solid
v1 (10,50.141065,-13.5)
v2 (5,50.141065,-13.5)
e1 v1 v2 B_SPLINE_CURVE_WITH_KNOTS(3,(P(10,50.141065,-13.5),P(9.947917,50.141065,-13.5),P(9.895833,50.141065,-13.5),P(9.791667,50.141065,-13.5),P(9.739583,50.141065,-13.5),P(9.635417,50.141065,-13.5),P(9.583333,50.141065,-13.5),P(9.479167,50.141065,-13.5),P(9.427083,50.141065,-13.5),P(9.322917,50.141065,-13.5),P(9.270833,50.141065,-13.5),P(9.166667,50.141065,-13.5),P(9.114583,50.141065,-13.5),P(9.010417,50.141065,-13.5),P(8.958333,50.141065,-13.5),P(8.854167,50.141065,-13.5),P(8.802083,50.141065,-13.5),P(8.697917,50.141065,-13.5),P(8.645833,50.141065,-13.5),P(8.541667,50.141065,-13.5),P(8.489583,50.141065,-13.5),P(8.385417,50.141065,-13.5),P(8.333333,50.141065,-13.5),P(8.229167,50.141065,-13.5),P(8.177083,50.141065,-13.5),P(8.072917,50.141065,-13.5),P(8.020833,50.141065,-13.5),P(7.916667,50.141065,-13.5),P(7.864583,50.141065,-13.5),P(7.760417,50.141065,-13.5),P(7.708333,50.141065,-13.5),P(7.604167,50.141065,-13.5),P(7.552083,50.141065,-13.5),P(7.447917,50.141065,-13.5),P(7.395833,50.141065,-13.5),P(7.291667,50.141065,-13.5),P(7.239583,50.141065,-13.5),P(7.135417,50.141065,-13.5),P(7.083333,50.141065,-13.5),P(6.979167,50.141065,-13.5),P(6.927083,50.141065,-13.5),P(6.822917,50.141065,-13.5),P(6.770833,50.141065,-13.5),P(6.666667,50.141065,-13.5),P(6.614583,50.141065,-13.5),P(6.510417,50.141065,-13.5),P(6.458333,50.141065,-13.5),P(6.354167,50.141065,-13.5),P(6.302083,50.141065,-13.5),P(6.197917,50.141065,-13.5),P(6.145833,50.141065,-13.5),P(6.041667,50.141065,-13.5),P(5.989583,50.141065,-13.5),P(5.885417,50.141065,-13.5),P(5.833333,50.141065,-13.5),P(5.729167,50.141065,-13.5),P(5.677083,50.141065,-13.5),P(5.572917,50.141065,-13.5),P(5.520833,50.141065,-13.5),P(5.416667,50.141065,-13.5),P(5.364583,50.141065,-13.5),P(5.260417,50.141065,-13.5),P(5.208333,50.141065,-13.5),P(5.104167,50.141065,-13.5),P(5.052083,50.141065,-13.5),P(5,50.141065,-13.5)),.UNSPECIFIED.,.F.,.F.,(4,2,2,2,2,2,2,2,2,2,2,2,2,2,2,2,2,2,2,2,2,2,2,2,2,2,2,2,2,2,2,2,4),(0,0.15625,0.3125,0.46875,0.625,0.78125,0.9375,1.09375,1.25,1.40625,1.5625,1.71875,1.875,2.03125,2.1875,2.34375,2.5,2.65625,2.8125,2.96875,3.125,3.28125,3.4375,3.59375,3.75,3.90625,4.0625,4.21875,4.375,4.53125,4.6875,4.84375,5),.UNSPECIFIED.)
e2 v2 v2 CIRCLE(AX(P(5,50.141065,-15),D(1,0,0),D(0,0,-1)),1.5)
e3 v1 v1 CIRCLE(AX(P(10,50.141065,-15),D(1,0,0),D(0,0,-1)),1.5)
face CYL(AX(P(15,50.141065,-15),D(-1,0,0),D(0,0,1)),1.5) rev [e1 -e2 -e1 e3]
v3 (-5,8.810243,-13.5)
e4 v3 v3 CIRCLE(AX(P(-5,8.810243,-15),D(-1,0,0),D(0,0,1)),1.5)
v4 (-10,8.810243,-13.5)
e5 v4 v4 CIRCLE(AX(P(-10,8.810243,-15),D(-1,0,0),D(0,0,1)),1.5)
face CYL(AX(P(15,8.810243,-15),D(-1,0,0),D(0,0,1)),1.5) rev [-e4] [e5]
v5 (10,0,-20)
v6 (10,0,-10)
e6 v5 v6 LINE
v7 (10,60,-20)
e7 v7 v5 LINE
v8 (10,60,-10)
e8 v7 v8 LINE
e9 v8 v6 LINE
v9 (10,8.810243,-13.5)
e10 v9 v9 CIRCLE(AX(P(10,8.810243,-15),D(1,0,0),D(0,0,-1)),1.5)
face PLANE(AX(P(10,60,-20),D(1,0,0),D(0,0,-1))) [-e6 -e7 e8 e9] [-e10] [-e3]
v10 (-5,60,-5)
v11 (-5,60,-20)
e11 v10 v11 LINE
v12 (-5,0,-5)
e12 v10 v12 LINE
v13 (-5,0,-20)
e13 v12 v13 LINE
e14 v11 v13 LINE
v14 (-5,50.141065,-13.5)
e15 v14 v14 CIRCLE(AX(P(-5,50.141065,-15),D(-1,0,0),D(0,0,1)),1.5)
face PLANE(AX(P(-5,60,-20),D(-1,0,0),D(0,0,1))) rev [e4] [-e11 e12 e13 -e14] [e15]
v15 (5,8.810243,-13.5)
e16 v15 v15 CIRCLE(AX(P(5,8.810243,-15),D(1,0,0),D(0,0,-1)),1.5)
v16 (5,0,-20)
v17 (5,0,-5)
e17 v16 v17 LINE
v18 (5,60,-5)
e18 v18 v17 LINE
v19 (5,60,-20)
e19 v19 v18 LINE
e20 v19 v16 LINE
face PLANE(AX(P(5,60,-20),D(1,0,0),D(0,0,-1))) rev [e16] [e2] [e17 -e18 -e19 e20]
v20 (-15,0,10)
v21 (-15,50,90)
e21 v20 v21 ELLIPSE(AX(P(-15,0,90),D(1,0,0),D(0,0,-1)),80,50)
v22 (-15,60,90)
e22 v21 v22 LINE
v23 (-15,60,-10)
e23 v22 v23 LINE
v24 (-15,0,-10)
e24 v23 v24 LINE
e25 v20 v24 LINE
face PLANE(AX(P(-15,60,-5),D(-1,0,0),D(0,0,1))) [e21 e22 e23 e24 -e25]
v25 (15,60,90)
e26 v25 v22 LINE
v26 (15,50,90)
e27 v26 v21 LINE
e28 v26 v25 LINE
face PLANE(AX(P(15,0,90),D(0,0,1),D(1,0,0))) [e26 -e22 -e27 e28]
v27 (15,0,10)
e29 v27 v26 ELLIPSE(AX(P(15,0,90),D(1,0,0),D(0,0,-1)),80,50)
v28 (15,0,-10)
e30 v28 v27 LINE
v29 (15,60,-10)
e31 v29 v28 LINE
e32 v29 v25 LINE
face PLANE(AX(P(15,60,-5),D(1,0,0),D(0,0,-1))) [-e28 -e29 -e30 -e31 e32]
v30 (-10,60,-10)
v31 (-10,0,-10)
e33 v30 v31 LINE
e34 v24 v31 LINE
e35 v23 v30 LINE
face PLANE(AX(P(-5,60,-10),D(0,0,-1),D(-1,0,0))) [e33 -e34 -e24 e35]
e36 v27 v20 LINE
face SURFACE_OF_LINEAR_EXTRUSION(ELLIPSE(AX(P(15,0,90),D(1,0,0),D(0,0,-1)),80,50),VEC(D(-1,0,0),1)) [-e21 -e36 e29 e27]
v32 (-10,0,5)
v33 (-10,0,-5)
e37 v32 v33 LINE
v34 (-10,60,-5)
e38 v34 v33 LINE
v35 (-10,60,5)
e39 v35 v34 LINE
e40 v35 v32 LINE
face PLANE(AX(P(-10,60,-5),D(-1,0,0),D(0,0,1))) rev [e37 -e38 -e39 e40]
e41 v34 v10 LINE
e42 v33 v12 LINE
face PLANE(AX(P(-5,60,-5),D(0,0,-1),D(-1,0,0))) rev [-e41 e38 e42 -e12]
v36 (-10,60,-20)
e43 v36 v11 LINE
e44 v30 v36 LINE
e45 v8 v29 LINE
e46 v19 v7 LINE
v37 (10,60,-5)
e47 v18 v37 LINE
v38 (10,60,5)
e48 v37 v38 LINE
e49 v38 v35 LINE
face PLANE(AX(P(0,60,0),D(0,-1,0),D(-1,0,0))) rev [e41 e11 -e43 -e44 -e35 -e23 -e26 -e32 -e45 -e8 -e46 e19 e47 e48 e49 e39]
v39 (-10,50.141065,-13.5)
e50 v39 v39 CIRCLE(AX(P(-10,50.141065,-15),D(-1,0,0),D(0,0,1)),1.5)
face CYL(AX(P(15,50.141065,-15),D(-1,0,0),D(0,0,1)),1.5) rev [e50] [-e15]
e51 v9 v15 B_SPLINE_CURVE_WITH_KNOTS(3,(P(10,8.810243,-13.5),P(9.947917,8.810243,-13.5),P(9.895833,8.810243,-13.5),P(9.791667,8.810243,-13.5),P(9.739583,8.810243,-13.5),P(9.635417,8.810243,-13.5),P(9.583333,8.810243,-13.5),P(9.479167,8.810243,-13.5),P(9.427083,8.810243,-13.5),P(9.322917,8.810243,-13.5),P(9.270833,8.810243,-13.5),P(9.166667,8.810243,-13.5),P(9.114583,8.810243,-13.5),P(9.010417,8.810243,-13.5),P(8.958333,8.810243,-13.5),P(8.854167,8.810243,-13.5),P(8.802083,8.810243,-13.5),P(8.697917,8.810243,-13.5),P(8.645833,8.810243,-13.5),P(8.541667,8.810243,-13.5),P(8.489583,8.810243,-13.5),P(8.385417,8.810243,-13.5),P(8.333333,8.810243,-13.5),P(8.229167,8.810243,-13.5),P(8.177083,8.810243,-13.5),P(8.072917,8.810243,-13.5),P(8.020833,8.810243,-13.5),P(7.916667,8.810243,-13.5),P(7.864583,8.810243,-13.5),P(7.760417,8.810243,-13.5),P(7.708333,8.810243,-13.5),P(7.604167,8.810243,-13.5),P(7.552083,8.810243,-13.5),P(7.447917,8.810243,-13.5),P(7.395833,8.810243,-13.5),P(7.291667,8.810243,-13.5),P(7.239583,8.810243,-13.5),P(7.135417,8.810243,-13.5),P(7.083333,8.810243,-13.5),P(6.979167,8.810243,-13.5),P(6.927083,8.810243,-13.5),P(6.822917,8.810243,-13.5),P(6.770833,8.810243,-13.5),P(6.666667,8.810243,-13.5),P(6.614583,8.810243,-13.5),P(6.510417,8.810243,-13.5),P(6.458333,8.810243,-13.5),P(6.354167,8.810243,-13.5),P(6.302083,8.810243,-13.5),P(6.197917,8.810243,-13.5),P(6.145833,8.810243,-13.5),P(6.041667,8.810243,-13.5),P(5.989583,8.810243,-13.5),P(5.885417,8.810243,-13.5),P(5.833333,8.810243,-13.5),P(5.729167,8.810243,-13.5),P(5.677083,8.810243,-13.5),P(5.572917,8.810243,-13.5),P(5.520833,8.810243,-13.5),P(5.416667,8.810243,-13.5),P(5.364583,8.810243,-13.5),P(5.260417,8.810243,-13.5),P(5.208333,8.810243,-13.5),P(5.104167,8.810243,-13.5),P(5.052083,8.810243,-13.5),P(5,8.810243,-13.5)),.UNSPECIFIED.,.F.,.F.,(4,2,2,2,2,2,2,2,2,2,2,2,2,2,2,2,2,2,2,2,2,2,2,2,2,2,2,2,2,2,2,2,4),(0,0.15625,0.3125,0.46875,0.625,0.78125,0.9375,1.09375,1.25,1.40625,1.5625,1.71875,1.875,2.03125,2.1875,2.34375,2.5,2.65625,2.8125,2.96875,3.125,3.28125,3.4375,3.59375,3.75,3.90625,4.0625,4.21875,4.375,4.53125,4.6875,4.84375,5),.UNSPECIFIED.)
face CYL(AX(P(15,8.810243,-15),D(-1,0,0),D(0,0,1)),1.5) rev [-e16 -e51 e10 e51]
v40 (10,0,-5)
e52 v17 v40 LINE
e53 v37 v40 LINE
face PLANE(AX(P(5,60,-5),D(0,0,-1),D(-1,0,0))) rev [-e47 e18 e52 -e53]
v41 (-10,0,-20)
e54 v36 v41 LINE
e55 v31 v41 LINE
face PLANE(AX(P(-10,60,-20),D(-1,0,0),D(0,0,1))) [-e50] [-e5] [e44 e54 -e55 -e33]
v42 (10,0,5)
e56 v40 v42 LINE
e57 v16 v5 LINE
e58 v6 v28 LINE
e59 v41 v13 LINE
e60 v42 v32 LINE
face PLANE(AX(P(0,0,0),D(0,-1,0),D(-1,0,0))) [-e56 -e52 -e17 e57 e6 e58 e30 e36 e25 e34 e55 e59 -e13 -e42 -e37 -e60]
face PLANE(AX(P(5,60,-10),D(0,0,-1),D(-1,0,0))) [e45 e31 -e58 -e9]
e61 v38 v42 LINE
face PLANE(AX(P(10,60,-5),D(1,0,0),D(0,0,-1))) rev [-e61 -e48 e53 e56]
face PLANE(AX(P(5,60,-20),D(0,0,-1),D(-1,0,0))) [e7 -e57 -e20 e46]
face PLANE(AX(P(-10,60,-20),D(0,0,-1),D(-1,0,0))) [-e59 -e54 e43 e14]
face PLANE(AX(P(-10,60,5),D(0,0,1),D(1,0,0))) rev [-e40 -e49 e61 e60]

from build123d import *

# Parameters (mm, degrees)
MAKAS_BA_LANT_S_DEPTH    = 60
MOTOR_UZANT_S_DEPTH      = 15
MOTOR_UZANT_S_DEPTH_BACK = 15
IZIM3_R                  = 1.5
C_VATALAR_DEPTH          = 112.018016714


# Read off the part's stored shape, not the designer's step: makas bağlantısı
with BuildPart() as part:
    # makas bağlantısı outline → makas bağlantısı (new body)
    with BuildSketch(Plane(origin=(0, 0, 0), x_dir=(1, 0, 0), z_dir=(0, 1, 0))):
        Polygon((-5, 5), (-5, 20), (-10, 20), (-10, 10), (-15, 10), (-15, -10), (15, -10), (15, 10), (10, 10), (10, 20), (5, 20), (5, 5), (10, 5), (10, -5), (-10, -5), (-10, 5), align=None)
    extrude(amount=MAKAS_BA_LANT_S_DEPTH)

    # Çizim2 → motor uzantısı (add, two sides: drawn at the far end of the back side and taken through both)
    with BuildSketch(Plane(origin=(0, 0, 0), x_dir=(0, 0, -1), z_dir=(1, 0, 0)).offset(-MOTOR_UZANT_S_DEPTH_BACK)):
        with BuildLine():
            Line((-10, 60), (-90, 60))
            Line((-90, 60), (-90, 50))
            add(Edge.make_bspline(
                [(-10, 0), (-10, 50), (-90, 50)],
                knots=[0, 0, 0, 1.570796327, 1.570796327, 1.570796327], degree=2, weights=[1, 0.707106781, 1]))
            Line((-10, 0), (-10, 60))
        make_face()
    extrude(amount=MOTOR_UZANT_S_DEPTH + MOTOR_UZANT_S_DEPTH_BACK)

    # Çizim3 → cıvatalar (cut, through all)
    with BuildSketch(Plane.ZY.offset(10)):
        with Locations((-15, 50.141064744)):
            Circle(IZIM3_R)
        with Locations((-15, 8.810242757)):
            Circle(IZIM3_R)
    extrude(amount=-C_VATALAR_DEPTH, mode=Mode.SUBTRACT)


solid = part.part
